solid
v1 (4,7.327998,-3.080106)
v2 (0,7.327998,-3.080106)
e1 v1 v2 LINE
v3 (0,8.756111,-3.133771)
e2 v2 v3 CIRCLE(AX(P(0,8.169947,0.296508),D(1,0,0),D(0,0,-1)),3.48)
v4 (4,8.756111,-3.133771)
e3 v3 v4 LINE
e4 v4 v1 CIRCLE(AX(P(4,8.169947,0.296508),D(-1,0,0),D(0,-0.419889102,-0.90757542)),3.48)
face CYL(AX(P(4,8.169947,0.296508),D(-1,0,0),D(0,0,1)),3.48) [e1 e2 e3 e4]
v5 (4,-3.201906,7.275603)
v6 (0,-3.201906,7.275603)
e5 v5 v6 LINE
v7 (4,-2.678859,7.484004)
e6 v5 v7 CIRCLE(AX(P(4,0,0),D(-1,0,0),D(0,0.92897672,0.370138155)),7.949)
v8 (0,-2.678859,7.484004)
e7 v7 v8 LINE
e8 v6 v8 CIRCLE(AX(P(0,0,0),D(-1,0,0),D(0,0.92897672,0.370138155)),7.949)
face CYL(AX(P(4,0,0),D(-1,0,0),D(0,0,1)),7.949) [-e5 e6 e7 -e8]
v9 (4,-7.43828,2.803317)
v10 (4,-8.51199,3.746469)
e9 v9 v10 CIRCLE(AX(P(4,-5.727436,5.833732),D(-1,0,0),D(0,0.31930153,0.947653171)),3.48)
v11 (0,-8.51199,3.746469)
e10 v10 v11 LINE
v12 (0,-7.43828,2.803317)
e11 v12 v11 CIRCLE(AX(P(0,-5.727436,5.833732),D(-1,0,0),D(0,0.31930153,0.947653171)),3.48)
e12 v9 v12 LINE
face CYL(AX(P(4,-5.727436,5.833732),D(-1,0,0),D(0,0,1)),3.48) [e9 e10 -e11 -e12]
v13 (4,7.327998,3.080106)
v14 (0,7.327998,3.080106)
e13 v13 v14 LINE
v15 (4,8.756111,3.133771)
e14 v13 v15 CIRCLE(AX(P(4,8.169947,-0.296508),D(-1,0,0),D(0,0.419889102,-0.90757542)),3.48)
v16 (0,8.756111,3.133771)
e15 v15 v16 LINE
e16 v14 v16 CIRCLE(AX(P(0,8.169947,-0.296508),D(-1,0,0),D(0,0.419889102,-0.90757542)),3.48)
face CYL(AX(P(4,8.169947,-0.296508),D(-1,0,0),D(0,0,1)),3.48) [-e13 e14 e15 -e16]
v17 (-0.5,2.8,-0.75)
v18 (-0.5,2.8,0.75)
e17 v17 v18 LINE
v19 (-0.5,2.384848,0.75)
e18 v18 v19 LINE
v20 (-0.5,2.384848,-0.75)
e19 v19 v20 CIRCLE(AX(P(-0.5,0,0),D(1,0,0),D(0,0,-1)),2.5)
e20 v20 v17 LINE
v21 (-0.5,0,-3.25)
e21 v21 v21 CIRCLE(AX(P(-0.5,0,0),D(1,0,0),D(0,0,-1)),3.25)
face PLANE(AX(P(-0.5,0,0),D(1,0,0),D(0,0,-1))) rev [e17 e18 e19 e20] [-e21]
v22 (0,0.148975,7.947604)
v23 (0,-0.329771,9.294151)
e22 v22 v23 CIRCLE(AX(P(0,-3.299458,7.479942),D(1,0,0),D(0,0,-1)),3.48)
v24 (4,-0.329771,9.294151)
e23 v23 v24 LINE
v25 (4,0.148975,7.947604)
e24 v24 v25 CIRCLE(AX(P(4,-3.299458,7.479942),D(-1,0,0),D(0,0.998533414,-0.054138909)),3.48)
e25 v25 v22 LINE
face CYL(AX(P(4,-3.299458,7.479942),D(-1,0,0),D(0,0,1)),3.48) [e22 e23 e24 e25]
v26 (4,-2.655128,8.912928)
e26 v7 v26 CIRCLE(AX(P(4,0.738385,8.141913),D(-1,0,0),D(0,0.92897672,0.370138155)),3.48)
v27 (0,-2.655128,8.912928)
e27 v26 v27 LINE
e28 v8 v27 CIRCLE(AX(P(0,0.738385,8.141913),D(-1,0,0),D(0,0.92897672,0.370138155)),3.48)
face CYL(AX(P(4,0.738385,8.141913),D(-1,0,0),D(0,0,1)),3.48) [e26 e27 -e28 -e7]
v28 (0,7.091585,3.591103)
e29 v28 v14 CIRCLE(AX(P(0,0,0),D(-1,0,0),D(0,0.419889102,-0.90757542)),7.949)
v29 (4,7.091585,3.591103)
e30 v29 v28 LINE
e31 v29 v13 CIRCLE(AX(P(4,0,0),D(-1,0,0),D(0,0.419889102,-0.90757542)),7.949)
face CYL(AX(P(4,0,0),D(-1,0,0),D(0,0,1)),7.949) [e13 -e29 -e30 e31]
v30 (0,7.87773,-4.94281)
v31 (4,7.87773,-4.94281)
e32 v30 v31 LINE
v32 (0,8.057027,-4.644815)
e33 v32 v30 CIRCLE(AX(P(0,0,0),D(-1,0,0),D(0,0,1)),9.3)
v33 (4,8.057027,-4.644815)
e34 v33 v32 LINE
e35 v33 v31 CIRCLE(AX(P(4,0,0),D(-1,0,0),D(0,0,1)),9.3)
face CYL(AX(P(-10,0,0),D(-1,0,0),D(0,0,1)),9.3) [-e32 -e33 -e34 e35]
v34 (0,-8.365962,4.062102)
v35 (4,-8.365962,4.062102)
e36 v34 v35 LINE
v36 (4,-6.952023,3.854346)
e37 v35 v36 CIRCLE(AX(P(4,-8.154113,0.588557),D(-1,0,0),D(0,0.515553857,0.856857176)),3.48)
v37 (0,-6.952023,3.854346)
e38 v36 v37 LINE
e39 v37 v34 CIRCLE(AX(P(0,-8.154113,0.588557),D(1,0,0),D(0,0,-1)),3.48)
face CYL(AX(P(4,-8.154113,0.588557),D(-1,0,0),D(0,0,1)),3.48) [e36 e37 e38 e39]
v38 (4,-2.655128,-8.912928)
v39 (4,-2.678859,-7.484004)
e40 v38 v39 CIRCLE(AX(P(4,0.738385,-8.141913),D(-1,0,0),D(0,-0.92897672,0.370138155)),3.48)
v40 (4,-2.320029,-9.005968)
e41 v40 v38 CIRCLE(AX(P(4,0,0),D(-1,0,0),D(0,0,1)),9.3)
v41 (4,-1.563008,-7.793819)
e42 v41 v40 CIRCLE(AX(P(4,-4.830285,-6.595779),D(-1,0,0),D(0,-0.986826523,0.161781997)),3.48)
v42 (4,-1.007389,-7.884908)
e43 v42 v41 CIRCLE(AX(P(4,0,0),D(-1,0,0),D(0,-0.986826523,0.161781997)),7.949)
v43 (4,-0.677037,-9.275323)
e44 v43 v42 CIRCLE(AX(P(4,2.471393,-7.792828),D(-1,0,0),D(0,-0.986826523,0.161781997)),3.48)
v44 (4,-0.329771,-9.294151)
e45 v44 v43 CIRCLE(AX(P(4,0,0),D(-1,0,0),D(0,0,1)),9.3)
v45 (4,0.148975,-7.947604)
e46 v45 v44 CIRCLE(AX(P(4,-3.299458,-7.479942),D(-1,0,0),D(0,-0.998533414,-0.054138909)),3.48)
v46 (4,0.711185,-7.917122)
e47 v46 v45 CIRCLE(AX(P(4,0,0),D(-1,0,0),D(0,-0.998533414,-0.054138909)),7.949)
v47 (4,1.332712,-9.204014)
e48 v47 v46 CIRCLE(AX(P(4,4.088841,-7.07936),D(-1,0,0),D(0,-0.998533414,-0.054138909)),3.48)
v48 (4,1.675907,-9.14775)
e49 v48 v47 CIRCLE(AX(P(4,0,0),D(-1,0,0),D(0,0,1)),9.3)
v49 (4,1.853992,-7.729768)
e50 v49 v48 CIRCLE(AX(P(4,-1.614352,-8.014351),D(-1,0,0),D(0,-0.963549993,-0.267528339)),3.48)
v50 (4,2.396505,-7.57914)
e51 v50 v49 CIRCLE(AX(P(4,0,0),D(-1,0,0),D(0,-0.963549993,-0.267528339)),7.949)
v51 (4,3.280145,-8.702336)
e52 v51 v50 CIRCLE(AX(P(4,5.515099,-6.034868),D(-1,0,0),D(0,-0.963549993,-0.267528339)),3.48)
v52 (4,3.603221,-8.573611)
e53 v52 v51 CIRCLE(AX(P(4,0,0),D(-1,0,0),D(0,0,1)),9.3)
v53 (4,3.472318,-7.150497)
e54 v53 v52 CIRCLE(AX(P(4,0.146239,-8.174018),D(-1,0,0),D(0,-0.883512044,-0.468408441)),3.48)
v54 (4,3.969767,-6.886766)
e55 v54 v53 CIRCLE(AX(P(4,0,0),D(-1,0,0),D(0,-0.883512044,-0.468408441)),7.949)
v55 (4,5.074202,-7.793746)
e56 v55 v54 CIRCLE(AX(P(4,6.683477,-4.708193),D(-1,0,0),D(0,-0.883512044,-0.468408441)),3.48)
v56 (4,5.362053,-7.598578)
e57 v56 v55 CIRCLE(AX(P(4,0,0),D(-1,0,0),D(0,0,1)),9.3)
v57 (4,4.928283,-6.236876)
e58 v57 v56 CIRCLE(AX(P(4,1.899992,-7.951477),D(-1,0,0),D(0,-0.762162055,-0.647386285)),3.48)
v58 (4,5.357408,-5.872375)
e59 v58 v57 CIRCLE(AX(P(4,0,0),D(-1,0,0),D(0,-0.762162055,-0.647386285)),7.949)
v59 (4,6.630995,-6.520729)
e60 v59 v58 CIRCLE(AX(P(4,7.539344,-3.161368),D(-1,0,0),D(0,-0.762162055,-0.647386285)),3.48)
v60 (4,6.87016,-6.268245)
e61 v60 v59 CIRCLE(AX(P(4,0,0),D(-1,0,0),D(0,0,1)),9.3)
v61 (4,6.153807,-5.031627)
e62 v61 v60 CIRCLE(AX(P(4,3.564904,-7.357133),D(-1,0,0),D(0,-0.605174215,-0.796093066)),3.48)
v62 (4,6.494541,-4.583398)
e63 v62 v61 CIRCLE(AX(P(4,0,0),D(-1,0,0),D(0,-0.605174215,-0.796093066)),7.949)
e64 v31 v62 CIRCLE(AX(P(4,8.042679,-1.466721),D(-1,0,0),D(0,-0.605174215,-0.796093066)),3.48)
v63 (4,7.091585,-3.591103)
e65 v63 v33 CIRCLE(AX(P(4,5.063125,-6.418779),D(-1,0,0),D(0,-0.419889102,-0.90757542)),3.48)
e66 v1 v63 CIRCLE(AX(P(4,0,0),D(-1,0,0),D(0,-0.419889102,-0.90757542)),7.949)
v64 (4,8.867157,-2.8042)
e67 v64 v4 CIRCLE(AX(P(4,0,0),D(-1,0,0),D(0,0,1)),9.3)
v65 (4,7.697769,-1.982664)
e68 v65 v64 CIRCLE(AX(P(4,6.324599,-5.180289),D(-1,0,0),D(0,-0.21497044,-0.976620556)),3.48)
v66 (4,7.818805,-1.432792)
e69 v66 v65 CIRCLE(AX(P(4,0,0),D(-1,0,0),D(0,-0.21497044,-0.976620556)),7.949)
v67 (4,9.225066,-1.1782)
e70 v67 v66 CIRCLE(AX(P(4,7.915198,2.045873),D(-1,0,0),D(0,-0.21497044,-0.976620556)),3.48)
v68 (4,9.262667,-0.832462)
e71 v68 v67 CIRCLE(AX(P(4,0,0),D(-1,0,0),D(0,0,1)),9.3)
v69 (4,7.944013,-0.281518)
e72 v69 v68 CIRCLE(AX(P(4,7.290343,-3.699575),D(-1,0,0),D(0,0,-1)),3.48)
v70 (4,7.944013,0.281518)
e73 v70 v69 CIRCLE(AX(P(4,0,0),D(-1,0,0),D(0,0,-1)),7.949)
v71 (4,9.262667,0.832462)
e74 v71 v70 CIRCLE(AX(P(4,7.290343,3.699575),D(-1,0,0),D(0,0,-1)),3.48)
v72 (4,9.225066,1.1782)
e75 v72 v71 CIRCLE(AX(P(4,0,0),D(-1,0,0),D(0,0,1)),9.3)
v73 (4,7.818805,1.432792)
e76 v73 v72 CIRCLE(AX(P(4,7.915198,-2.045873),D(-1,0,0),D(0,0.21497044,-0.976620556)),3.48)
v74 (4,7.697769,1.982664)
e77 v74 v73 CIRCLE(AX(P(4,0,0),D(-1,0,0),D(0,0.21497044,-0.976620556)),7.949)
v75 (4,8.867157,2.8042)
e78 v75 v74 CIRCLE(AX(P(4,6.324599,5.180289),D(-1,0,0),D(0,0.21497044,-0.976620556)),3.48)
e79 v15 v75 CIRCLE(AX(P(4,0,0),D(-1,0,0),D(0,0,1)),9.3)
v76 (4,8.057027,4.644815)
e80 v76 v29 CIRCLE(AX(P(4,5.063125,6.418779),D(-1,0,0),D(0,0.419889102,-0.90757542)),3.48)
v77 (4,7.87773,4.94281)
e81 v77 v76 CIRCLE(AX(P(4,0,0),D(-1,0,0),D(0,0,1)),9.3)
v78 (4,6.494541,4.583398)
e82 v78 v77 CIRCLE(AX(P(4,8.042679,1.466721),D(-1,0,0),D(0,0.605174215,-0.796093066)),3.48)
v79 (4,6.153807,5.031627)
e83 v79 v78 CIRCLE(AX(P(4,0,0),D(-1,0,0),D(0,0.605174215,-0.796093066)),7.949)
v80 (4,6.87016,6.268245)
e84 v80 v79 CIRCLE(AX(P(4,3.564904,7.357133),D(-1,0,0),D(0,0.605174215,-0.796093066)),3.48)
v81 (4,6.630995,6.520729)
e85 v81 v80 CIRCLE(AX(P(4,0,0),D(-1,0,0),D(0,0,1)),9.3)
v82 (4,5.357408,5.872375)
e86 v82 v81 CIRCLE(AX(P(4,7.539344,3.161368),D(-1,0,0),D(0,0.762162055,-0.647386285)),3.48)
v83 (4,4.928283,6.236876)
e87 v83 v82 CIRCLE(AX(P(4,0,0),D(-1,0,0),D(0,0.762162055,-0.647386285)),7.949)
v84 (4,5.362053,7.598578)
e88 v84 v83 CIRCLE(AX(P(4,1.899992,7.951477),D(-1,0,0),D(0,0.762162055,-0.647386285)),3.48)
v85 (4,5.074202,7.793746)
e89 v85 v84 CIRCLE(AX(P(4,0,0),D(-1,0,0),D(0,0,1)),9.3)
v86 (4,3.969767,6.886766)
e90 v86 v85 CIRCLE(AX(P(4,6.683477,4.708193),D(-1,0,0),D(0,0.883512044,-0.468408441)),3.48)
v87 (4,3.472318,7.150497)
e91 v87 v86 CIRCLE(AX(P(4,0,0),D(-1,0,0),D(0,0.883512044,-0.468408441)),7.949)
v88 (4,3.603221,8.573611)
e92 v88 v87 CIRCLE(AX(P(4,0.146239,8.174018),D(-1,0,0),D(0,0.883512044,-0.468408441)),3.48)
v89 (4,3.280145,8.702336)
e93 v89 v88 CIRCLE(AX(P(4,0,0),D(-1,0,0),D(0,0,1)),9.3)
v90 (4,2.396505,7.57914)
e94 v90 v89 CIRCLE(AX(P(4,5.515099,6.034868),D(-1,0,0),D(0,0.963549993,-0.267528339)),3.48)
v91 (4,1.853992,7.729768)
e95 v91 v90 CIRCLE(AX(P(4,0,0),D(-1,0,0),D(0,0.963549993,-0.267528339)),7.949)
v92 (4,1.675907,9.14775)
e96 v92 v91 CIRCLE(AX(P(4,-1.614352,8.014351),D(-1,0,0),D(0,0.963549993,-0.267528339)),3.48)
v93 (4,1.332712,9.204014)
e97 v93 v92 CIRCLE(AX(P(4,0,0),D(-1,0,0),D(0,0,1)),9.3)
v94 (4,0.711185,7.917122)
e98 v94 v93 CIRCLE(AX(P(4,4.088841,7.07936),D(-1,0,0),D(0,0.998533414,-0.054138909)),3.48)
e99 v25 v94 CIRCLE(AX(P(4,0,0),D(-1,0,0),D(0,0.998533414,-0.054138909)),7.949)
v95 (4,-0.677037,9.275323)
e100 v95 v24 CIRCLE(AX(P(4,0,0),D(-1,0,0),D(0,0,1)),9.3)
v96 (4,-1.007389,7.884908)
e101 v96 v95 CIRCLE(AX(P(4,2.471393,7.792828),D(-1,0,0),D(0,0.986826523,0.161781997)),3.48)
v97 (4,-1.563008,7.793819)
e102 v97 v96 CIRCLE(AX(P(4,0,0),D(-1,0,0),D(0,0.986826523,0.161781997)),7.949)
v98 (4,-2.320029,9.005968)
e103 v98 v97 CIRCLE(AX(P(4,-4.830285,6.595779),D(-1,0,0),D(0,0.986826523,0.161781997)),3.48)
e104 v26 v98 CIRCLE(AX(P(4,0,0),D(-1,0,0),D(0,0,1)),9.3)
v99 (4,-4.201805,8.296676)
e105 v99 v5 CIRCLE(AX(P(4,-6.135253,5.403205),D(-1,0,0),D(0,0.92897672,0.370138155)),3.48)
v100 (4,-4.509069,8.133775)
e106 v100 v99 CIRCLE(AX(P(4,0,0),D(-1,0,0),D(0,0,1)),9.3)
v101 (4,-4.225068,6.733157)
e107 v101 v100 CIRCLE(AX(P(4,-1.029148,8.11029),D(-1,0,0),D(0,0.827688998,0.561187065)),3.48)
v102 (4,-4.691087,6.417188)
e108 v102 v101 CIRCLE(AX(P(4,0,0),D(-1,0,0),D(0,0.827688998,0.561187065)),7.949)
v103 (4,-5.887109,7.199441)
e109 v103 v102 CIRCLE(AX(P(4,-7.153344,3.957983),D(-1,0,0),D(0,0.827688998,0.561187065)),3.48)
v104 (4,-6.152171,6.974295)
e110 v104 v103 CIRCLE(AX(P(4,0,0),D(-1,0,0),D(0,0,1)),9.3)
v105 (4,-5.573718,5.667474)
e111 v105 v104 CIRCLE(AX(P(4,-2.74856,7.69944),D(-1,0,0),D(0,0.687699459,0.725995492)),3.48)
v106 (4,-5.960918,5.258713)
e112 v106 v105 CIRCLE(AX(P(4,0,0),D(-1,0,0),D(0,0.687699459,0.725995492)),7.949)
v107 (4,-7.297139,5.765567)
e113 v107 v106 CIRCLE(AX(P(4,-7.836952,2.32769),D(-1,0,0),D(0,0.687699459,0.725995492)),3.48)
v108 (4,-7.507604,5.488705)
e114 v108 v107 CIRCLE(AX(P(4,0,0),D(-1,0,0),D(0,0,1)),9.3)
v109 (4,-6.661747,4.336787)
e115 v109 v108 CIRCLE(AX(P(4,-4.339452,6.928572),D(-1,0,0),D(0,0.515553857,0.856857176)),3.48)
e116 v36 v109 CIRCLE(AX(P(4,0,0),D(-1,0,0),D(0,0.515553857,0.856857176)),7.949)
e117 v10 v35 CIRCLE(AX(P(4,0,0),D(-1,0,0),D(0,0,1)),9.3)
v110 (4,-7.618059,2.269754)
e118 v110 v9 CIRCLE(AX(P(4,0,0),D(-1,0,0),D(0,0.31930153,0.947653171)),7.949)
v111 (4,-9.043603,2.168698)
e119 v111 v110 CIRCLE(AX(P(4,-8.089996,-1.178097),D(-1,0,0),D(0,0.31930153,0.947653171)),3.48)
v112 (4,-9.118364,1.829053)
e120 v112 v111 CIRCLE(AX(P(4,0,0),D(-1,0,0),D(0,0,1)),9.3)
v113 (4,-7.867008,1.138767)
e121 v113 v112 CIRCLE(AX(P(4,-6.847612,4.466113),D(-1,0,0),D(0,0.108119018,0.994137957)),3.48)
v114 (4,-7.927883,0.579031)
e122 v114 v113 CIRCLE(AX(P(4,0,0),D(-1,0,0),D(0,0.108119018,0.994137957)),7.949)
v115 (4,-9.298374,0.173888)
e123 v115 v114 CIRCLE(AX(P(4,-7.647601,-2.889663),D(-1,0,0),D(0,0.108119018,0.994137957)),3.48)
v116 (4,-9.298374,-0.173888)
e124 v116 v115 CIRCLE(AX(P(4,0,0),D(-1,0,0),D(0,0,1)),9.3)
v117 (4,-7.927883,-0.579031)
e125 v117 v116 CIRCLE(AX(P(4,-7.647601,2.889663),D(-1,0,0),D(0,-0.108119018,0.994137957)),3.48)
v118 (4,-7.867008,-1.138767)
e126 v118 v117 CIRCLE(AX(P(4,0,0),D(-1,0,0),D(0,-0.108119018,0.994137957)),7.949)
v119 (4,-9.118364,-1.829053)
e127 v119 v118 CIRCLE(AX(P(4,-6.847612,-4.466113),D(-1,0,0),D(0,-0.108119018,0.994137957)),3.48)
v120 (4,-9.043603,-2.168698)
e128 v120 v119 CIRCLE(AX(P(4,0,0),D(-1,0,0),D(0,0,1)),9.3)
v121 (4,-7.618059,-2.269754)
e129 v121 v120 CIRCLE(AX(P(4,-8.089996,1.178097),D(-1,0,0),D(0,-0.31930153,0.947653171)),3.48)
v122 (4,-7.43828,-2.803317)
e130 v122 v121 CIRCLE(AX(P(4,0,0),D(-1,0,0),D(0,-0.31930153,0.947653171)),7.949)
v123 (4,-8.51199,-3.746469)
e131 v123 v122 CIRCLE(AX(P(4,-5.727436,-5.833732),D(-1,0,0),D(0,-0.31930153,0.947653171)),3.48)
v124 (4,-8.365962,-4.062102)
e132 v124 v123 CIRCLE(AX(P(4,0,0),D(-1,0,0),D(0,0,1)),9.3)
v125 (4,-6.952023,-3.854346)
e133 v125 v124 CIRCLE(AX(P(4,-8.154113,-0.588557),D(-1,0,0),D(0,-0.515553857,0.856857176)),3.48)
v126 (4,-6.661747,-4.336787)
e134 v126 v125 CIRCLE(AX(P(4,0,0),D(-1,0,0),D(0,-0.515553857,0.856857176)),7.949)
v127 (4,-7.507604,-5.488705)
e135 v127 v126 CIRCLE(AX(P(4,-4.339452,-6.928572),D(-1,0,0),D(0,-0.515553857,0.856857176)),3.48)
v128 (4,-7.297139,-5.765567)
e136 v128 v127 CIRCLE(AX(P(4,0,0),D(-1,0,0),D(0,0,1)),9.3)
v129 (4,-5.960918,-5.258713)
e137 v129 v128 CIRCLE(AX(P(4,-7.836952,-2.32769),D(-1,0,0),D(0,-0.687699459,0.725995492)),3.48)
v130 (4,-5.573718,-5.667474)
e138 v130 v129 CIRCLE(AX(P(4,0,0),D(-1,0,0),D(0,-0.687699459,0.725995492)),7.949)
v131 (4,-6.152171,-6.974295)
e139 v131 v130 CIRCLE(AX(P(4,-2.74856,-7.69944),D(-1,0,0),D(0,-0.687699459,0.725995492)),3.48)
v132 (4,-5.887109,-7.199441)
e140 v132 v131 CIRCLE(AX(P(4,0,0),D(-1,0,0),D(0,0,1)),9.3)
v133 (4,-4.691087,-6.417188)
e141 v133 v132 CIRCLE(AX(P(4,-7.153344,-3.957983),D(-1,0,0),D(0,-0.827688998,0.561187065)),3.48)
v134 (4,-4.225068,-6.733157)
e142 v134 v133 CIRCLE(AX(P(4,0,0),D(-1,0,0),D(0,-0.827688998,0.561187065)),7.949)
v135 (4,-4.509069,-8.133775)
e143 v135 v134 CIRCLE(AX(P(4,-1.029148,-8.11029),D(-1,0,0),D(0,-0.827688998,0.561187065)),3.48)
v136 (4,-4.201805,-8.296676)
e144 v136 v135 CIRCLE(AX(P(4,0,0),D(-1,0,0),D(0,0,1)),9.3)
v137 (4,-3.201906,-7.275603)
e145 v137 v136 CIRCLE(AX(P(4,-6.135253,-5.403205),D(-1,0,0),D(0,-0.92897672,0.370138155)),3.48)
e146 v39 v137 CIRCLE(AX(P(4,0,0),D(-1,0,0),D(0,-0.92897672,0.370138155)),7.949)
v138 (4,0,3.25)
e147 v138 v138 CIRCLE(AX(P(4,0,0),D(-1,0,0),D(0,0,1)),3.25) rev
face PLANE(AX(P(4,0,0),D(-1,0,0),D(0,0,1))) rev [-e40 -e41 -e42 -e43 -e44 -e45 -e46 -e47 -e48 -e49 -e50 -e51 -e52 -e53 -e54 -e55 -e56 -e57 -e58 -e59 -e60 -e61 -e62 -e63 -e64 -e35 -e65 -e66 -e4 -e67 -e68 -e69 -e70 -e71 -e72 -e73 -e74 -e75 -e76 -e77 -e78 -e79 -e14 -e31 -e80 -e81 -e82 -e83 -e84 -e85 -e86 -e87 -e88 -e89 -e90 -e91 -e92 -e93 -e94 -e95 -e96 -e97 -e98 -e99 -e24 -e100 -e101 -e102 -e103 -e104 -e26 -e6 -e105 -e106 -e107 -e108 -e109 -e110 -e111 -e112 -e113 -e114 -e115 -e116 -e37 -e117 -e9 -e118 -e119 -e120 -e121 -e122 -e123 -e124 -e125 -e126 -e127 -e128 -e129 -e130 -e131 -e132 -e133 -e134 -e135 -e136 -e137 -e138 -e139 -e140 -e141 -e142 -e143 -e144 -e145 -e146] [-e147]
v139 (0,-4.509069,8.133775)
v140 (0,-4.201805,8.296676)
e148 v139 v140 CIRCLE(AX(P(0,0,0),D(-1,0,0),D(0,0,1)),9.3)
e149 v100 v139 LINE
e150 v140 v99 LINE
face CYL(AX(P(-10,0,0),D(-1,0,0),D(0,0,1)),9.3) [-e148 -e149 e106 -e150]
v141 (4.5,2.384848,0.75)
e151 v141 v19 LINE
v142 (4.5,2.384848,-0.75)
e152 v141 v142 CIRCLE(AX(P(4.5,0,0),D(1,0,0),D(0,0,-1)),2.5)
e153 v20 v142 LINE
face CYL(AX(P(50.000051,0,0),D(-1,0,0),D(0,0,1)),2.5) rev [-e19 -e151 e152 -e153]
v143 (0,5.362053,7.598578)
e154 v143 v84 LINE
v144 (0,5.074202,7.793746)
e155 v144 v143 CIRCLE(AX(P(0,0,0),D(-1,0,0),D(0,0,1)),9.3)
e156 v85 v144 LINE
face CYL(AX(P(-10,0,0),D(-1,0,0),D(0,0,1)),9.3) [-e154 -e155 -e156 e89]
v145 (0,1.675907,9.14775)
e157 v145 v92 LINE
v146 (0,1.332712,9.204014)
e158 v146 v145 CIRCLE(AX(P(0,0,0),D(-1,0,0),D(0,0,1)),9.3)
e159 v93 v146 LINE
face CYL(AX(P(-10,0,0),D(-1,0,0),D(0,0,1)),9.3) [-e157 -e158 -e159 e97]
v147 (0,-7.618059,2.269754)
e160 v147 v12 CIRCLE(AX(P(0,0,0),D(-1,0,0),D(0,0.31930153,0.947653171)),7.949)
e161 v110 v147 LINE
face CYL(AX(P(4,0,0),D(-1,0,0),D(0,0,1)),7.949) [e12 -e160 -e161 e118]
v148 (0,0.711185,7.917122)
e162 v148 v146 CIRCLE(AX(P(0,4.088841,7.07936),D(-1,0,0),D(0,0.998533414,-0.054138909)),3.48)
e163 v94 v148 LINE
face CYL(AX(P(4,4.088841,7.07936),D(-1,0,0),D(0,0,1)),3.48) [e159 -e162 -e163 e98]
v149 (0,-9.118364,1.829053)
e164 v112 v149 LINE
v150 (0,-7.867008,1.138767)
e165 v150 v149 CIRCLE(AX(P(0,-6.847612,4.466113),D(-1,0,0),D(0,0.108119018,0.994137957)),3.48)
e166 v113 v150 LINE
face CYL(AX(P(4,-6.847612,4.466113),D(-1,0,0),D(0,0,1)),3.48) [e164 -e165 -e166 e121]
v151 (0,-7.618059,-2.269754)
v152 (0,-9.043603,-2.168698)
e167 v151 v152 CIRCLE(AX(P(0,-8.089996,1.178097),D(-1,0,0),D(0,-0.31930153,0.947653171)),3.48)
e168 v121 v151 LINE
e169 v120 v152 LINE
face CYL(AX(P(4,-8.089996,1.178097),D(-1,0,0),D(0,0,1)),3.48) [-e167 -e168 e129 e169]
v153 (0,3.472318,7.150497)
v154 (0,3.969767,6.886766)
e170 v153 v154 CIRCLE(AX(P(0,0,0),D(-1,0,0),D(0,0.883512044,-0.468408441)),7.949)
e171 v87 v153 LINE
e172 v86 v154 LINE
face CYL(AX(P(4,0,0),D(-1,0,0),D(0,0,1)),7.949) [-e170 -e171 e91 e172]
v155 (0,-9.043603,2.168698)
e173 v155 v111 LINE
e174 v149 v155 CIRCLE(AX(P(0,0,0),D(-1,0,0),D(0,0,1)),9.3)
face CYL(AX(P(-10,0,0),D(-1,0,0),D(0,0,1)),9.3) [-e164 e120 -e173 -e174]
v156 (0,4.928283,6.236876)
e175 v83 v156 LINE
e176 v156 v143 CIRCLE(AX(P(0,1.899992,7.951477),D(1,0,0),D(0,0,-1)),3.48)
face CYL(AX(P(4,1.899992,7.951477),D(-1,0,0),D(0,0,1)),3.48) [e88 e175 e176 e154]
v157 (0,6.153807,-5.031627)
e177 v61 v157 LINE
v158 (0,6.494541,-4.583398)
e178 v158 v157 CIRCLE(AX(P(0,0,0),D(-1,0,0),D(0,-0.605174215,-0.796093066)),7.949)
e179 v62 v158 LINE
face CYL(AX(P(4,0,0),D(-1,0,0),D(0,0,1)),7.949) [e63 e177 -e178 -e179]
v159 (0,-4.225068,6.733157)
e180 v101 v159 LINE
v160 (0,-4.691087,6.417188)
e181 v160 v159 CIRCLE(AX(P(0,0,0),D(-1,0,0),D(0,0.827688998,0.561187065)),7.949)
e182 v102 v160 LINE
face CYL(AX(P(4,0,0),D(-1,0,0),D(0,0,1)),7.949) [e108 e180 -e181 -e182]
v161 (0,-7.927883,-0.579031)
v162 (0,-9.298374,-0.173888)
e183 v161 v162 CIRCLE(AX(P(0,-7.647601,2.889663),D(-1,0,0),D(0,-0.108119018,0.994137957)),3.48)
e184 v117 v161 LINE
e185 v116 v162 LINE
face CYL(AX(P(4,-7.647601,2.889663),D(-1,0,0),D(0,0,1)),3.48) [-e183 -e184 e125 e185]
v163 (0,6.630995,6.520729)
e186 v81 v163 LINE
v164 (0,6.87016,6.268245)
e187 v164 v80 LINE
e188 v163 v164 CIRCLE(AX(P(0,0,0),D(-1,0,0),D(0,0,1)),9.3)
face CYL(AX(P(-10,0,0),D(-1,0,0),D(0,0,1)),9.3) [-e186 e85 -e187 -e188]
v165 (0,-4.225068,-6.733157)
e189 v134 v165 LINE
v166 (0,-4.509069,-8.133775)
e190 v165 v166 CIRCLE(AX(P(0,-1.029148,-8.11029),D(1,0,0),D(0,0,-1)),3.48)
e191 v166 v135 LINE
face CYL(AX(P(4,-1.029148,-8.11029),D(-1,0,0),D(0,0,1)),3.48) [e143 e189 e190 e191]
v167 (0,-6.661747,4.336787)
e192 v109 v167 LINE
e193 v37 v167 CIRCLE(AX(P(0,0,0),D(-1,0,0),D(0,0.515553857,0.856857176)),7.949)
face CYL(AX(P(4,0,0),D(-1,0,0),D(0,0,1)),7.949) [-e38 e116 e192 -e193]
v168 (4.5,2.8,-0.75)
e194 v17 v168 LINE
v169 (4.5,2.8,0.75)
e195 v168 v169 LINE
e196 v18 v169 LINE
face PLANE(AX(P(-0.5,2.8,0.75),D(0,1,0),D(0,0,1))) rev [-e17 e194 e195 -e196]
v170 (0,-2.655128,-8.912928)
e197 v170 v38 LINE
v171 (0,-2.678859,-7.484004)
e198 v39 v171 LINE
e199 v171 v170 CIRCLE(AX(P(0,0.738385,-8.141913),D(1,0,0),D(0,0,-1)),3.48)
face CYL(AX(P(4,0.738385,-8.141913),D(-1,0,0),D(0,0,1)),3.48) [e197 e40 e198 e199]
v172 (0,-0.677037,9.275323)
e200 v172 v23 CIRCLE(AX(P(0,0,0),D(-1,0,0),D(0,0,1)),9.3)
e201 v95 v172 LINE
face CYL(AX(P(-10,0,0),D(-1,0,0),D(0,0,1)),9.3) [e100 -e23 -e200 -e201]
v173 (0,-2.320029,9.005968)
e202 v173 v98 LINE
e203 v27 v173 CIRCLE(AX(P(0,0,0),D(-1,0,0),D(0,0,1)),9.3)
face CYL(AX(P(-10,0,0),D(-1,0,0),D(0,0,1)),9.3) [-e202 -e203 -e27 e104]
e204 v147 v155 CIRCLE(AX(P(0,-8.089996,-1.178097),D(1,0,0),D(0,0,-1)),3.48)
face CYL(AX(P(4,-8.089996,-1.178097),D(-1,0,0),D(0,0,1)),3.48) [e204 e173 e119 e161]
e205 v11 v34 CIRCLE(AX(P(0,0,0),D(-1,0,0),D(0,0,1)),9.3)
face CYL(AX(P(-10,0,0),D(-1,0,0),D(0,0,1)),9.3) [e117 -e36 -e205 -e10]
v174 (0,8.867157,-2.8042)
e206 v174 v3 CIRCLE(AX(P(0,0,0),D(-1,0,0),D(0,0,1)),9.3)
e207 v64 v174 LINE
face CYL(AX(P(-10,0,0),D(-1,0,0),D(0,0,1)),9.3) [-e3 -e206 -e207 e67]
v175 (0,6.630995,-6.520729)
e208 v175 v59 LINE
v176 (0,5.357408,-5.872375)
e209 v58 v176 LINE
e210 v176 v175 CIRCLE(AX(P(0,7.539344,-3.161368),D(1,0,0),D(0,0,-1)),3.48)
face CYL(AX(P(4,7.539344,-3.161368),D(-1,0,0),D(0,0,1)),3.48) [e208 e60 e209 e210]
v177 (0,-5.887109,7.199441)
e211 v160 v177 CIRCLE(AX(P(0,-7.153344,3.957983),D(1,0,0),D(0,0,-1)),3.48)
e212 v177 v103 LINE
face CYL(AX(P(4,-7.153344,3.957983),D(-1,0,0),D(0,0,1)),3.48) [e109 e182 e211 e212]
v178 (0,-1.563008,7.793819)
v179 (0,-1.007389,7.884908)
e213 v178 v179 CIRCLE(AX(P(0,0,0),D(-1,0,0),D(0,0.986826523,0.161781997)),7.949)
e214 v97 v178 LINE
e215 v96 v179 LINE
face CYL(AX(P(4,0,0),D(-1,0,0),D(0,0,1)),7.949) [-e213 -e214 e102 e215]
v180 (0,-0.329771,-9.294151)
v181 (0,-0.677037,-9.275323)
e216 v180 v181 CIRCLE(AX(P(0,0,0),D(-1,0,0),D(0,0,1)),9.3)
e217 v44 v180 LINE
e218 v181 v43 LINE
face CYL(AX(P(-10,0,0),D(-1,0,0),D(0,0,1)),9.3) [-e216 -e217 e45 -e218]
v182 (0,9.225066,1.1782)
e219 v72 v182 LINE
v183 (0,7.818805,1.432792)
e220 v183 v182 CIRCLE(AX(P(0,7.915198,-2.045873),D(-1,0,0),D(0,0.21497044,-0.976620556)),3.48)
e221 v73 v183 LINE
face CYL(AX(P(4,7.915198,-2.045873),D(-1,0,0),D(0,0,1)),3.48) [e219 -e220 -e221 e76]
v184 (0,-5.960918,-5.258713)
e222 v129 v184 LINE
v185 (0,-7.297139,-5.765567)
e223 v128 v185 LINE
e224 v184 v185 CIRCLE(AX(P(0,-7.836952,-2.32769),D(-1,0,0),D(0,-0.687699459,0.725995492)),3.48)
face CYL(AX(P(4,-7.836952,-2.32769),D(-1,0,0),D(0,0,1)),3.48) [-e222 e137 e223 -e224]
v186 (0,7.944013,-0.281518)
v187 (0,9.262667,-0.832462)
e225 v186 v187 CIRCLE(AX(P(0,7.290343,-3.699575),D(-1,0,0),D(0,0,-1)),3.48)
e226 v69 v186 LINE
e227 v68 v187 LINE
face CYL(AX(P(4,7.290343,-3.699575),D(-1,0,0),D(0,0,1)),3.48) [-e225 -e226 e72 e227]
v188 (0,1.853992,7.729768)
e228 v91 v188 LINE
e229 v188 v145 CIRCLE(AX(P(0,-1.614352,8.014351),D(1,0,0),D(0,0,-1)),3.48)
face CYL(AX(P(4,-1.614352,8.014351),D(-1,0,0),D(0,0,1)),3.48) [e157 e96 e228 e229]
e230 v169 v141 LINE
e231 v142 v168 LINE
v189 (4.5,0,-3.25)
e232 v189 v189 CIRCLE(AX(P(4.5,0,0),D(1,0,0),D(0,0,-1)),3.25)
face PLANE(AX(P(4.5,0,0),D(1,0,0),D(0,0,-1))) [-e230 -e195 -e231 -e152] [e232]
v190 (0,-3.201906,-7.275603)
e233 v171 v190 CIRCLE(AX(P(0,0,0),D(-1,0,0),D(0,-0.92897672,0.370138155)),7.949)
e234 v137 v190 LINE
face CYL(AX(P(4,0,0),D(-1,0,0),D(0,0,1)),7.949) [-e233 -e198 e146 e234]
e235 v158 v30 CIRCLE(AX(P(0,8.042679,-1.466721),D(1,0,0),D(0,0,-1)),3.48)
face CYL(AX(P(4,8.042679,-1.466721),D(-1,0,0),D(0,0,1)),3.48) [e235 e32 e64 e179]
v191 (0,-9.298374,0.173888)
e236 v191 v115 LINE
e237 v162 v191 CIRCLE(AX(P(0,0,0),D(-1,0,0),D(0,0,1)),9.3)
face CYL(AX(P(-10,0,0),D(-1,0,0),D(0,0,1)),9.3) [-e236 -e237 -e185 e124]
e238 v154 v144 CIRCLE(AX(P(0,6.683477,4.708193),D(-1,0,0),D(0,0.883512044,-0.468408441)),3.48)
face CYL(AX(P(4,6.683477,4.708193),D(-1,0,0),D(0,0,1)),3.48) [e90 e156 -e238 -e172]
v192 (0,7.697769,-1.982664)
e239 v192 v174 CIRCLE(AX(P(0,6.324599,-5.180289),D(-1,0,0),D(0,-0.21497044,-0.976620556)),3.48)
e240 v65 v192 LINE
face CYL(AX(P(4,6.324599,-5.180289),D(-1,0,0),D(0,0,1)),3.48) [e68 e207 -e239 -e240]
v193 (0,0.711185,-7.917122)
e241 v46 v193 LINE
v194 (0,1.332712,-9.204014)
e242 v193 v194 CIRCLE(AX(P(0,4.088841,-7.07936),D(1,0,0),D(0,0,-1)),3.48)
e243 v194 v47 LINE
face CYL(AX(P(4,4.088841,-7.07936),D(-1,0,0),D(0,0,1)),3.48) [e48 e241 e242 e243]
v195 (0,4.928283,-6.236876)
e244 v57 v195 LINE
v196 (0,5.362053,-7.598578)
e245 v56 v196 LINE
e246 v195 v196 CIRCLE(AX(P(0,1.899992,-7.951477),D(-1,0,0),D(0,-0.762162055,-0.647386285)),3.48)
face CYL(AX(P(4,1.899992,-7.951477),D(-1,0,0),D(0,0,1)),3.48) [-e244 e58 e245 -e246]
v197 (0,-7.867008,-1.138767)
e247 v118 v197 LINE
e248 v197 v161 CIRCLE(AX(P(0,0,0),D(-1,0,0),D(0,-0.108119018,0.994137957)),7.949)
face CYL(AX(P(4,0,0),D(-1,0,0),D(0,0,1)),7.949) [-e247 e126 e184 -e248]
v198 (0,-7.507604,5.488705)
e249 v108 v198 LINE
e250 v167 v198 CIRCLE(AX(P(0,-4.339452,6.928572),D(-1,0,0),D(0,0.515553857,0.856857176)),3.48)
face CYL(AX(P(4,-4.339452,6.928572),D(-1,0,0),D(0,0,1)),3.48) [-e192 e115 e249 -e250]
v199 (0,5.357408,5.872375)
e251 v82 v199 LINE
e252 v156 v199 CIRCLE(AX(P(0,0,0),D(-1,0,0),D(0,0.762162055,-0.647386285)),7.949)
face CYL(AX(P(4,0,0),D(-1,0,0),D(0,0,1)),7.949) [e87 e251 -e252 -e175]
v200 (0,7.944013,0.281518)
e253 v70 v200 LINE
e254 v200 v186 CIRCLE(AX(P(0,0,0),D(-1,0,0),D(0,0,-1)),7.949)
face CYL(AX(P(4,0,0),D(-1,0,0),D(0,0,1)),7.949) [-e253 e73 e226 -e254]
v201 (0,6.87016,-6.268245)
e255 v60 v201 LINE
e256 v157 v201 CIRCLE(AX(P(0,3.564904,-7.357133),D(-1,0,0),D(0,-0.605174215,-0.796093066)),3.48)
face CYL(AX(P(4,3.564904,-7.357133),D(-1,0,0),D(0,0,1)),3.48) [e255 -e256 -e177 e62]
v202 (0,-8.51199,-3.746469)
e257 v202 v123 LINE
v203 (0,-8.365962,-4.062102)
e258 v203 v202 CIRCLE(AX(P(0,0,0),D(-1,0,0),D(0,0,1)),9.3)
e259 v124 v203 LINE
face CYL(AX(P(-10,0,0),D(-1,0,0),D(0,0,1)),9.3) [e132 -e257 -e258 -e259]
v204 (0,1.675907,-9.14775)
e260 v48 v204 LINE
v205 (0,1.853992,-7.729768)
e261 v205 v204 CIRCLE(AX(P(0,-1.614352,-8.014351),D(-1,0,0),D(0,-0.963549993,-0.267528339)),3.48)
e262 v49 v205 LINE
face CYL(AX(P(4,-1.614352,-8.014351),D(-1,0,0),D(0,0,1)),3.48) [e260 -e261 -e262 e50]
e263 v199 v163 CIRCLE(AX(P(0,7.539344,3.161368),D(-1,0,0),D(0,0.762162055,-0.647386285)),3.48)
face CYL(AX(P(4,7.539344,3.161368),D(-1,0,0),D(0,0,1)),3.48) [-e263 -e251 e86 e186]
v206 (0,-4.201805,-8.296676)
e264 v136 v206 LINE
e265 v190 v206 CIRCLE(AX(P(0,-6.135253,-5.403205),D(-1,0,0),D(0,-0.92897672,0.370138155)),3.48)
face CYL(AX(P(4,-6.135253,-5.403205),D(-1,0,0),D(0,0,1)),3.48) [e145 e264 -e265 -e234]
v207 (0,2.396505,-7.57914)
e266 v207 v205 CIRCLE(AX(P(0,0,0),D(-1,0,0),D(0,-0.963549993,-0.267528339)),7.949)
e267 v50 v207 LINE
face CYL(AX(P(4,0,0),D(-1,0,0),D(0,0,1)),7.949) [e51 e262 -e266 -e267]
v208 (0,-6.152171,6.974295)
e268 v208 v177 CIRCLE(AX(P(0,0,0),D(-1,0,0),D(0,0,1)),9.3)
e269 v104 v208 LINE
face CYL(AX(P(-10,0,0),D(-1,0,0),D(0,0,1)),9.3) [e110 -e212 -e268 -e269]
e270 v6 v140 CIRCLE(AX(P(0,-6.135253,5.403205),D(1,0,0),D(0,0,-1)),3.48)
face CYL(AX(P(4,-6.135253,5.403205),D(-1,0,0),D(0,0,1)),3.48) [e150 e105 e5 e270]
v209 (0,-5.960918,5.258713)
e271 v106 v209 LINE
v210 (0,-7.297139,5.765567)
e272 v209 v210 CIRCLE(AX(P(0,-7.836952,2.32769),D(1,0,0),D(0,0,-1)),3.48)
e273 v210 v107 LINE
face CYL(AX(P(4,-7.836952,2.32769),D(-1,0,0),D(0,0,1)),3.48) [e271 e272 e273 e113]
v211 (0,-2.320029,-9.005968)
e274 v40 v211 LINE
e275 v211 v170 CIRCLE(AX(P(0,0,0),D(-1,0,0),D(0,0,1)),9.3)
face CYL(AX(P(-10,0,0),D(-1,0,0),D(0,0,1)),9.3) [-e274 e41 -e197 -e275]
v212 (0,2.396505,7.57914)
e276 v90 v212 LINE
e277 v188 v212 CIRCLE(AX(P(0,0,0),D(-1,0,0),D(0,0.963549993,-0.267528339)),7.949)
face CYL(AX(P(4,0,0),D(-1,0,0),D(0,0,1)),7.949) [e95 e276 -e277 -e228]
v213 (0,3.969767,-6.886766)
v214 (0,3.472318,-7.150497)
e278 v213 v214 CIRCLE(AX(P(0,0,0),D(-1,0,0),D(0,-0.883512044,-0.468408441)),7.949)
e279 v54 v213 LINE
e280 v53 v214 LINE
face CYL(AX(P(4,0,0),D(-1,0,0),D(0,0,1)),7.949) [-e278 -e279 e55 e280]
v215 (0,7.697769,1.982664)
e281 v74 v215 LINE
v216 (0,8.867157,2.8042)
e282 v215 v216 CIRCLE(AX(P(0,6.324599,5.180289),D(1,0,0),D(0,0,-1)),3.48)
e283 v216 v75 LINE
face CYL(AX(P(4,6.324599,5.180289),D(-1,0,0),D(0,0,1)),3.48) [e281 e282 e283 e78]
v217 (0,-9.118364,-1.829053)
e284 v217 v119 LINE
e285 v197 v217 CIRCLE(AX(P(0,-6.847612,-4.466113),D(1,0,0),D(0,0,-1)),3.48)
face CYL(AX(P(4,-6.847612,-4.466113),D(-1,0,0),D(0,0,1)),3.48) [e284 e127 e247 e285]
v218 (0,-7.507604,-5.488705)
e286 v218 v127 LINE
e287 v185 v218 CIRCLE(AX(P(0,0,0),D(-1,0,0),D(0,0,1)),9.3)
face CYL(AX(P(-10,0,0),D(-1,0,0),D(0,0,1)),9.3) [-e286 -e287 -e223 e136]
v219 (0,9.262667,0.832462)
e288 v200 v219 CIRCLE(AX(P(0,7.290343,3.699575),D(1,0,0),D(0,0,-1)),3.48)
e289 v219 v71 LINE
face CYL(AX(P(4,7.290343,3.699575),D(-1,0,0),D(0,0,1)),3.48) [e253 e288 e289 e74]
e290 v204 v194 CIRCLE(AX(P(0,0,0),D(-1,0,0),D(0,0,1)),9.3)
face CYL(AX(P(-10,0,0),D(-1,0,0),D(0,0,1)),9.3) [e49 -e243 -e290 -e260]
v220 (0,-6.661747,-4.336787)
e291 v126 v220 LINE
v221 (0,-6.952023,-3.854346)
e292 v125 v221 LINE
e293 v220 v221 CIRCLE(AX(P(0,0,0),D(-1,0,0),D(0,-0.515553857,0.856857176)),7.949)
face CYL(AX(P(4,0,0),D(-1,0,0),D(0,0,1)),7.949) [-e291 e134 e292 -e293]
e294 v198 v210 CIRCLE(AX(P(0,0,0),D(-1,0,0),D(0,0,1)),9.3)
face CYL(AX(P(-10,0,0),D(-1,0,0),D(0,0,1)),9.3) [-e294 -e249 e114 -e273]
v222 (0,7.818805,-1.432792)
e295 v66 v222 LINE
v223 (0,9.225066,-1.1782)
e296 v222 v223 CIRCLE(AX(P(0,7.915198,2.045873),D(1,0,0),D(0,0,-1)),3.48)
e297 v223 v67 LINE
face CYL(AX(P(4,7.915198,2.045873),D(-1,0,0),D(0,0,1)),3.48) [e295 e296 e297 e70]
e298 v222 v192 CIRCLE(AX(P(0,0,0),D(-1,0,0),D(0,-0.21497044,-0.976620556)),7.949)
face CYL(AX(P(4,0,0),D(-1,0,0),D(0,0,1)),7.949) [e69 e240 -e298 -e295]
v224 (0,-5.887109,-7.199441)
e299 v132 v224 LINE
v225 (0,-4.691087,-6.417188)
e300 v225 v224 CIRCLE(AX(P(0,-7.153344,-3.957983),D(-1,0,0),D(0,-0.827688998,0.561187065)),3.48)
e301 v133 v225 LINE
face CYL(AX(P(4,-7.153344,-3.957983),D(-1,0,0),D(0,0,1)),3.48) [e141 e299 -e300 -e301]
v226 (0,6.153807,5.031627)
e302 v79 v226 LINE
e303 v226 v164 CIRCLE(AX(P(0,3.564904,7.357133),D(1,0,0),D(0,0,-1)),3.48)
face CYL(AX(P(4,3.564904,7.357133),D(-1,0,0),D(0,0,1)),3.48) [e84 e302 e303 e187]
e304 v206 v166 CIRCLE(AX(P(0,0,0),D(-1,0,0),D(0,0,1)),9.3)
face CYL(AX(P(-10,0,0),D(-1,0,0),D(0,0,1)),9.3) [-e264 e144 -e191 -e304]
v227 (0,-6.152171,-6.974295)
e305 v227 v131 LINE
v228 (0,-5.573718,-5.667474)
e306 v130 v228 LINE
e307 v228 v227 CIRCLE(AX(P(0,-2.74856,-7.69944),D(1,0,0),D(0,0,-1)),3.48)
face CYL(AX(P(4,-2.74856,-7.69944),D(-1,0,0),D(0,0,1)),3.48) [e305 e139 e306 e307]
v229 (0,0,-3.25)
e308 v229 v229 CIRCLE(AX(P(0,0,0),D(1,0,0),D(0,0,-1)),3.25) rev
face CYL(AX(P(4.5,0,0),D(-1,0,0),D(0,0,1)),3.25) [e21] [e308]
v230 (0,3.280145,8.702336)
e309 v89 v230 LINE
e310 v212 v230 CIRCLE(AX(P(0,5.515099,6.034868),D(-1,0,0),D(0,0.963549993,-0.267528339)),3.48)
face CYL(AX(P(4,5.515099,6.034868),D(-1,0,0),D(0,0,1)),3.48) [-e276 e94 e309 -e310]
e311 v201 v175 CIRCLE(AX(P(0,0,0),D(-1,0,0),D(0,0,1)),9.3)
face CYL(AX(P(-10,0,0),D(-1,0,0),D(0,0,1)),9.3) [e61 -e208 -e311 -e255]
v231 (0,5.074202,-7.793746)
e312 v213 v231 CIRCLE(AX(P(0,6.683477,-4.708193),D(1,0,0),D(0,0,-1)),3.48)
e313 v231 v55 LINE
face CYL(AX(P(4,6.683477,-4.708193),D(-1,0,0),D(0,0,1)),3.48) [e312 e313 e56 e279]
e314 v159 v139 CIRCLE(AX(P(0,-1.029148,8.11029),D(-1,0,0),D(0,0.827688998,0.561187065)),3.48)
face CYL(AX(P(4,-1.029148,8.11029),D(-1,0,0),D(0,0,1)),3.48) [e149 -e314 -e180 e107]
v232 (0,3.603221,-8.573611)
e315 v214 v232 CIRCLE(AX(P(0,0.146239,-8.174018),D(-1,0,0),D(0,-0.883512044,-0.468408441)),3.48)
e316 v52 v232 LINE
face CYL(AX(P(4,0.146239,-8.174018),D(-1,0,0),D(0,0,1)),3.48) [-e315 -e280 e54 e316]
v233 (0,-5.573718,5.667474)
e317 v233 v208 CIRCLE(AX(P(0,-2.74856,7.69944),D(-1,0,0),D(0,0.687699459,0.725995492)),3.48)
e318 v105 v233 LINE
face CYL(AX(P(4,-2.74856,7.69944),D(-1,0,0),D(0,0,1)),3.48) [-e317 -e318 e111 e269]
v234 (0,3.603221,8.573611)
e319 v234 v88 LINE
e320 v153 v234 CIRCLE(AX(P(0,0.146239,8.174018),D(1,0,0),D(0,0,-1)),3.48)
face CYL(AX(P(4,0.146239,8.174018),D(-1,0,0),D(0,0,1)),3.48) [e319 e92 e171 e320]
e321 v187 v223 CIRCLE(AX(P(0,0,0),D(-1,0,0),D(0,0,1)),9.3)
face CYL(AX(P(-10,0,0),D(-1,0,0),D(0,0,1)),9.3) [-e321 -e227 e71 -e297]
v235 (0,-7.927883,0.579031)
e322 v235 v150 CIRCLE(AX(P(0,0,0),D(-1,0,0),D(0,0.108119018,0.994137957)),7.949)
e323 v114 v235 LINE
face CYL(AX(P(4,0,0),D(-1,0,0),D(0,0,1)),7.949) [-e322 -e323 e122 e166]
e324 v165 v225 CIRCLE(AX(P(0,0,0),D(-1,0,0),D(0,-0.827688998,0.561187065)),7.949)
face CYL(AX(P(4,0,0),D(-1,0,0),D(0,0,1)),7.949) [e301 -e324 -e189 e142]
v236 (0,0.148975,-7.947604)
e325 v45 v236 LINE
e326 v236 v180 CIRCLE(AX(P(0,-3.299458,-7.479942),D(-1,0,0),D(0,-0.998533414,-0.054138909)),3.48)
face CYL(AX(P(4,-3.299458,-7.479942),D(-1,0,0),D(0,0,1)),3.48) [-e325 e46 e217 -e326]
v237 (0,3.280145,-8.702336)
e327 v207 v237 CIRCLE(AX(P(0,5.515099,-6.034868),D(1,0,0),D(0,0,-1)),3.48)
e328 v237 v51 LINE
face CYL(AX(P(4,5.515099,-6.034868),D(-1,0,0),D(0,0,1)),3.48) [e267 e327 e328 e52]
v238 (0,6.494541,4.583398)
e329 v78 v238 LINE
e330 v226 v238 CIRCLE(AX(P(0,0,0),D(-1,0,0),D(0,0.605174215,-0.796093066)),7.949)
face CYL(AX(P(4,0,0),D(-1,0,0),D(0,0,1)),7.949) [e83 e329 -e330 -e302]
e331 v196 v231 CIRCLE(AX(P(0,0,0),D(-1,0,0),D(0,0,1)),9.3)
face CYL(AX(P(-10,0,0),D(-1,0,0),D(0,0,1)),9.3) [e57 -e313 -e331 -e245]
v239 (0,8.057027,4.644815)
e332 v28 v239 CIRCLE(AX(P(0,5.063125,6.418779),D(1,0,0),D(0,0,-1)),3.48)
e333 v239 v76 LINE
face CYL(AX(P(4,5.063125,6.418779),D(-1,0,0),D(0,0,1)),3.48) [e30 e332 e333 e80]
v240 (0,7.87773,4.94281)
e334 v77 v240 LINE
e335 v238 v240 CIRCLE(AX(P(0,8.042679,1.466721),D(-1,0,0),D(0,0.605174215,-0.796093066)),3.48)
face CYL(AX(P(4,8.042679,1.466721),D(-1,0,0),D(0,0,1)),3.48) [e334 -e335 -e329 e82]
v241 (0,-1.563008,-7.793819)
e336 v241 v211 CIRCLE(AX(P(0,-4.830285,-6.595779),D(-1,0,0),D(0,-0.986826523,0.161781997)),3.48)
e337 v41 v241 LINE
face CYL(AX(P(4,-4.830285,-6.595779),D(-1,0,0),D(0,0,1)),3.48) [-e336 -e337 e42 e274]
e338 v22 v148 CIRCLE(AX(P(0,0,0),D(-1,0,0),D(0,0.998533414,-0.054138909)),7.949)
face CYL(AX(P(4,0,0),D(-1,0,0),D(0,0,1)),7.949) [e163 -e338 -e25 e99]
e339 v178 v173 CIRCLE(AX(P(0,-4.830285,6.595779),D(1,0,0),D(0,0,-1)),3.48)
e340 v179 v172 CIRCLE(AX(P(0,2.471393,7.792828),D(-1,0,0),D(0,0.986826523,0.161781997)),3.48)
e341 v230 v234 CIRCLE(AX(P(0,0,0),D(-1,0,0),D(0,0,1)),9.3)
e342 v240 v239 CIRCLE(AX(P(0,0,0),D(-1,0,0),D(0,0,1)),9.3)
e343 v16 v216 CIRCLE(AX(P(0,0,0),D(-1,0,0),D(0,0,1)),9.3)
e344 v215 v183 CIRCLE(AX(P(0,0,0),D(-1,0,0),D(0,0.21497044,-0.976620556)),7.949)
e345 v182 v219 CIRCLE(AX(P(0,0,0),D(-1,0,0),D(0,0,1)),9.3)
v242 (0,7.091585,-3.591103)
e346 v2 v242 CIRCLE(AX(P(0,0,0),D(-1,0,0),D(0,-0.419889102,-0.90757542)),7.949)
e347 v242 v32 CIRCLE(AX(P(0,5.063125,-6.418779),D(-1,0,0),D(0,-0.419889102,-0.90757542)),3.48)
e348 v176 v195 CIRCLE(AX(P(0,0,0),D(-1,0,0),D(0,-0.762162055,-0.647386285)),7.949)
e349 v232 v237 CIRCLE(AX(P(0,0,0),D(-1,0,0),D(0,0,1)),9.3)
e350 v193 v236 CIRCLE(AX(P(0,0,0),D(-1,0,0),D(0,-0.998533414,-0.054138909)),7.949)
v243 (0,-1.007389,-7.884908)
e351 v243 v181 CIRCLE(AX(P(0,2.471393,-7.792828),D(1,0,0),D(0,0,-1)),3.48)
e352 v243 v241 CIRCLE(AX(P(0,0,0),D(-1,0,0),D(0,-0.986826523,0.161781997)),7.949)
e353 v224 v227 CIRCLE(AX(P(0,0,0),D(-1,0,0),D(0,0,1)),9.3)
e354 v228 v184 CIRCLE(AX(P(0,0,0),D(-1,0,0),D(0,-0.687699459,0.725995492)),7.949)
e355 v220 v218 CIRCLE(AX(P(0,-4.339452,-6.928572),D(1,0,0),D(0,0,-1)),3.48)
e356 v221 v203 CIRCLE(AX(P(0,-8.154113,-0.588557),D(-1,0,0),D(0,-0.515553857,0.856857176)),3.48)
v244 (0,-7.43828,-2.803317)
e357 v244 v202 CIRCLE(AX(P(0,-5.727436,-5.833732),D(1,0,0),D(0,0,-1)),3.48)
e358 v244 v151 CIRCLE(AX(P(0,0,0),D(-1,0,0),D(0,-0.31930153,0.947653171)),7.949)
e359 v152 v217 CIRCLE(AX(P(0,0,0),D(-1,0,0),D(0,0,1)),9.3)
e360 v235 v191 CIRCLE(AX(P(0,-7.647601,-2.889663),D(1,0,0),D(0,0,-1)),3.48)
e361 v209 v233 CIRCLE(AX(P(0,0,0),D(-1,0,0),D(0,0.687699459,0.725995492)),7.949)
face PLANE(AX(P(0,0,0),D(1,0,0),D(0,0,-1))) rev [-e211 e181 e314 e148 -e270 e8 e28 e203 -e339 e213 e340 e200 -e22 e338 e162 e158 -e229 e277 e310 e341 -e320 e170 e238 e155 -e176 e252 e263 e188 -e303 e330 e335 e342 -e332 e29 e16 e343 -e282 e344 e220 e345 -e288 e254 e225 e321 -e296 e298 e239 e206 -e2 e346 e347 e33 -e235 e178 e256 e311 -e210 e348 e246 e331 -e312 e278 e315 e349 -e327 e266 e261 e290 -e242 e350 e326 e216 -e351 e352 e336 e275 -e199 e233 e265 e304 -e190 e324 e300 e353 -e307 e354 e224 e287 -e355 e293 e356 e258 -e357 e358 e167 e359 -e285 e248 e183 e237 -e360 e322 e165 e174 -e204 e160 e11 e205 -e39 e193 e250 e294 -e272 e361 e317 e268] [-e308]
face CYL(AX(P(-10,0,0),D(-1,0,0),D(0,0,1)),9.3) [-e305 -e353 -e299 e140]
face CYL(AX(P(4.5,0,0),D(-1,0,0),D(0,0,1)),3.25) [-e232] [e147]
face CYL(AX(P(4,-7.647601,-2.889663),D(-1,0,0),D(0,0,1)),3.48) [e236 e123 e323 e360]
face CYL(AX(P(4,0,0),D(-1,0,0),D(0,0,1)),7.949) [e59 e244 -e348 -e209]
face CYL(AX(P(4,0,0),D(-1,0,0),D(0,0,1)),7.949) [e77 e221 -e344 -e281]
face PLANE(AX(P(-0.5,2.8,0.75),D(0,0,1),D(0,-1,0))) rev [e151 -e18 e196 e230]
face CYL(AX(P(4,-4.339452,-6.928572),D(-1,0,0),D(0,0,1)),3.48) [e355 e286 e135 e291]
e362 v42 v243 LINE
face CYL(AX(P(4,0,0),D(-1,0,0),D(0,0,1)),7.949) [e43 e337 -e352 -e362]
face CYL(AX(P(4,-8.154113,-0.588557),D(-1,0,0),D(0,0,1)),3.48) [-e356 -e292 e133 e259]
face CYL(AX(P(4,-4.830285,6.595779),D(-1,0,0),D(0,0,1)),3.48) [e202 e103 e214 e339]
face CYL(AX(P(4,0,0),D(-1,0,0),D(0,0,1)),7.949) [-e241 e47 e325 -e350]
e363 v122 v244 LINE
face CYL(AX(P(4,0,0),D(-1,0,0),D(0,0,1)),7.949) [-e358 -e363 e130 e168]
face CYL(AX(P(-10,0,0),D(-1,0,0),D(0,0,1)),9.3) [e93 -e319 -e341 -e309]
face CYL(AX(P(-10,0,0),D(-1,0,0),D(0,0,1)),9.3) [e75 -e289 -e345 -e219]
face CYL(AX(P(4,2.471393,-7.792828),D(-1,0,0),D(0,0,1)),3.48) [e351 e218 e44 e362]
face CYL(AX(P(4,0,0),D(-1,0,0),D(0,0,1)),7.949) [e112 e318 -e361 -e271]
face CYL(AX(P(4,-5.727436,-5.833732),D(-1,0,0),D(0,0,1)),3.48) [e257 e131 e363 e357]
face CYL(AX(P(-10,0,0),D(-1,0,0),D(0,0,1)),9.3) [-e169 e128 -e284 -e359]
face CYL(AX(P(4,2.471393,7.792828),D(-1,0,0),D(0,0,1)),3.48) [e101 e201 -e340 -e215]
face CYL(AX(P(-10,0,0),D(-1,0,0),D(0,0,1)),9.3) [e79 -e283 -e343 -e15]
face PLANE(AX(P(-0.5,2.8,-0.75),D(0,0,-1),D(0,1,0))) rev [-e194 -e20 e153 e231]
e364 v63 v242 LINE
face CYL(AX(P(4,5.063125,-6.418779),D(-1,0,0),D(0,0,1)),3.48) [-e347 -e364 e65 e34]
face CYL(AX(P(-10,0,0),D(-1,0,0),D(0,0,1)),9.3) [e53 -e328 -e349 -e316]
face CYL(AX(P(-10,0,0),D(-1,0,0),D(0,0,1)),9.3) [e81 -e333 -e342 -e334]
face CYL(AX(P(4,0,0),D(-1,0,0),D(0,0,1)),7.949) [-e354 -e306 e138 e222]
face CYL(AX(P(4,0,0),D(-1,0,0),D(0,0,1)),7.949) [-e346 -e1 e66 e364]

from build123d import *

# Parameters (mm, degrees)
BASPROSKE_W             = 4
BASPROSKE_H             = 9.3
TOOTHCUT_DEPTH          = 14.746999673
TEETHCUTS_COUNT         = 29
TEETHCUTS_ANGLE         = 347.586206897
BORSKE_R                = 2.5
BORE_DEPTH              = 50.0000508
EXTRUDE1_DEPTH          = 4.5
EXTRUDE1_DEPTH_BACK     = 0.5
SKETCH1_R               = 3.25
SKETCH1_R_2             = 2.5
CUT_EXTRUDE1_DEPTH      = 20
CUT_EXTRUDE1_DEPTH_BACK = 14.896807231
SKETCH2_W               = 1.5
SKETCH2_H               = 2.8


with BuildPart() as part:
    # BasProSke → Base-Revolve (revolve)
    with BuildSketch(Plane(origin=(0, 0, 0), x_dir=(1, 0, 0), z_dir=(0, 1, 0))):
        with Locations((2, 4.65)):
            Rectangle(BASPROSKE_W, BASPROSKE_H)
    revolve(axis=Axis((-10, 0, 0), (1, 0, 0)))

    # TooCutSke → ToothCut (cut, through all)
    with BuildSketch(Plane(origin=(0, 0, 0), x_dir=(0, 0, -1), z_dir=(1, 0, 0))):
        with BuildLine():
            ThreePointArc((0.281517973, 7.944013383), (0, 7.949), (-0.281517973, 7.944013383))
            ThreePointArc((-0.281517973, 7.944013383), (-0.494228582, 8.645390123), (-0.84911719, 9.28666168))
            ThreePointArc((-0.84911719, 9.28666168), (0, 9.3254), (0.84911719, 9.28666168))
            ThreePointArc((0.84911719, 9.28666168), (0.494228582, 8.645390123), (0.281517973, 7.944013383))
        make_face()
    toothcut = extrude(amount=TOOTHCUT_DEPTH, mode=Mode.SUBTRACT)

    # TeethCuts: ToothCut ×29 about axis
    teethcuts_axis = Axis((-10, 0, 0), (1, 0, 0))
    for i in range(1, TEETHCUTS_COUNT):
        add(toothcut.rotate(teethcuts_axis, i * TEETHCUTS_ANGLE / (TEETHCUTS_COUNT - 1)), mode=Mode.SUBTRACT)

    # BorSke → Bore (cut, symmetric)
    with BuildSketch(Plane(origin=(0, 0, 0), x_dir=(0, 0, -1), z_dir=(1, 0, 0))):
        Circle(BORSKE_R)
    extrude(amount=BORE_DEPTH, both=True, mode=Mode.SUBTRACT)

    # Sketch1 → Extrude1 (add, two sides: drawn at the far end of the back side and taken through both)
    with BuildSketch(Plane(origin=(0, 0, 0), x_dir=(0, 0, -1), z_dir=(1, 0, 0)).offset(-EXTRUDE1_DEPTH_BACK)):
        Circle(SKETCH1_R)
        Circle(SKETCH1_R_2, mode=Mode.SUBTRACT)
    extrude(amount=EXTRUDE1_DEPTH + EXTRUDE1_DEPTH_BACK)

    # Sketch2 → Cut-Extrude1 (cut, two sides: drawn at the far end of the back side and taken through both)
    with BuildSketch(Plane(origin=(0, 0, 0), x_dir=(0, 0, -1), z_dir=(1, 0, 0)).offset(-CUT_EXTRUDE1_DEPTH_BACK)):
        with Locations((0, 1.4)):
            Rectangle(SKETCH2_W, SKETCH2_H)
    extrude(amount=CUT_EXTRUDE1_DEPTH + CUT_EXTRUDE1_DEPTH_BACK, mode=Mode.SUBTRACT)


solid = part.part
